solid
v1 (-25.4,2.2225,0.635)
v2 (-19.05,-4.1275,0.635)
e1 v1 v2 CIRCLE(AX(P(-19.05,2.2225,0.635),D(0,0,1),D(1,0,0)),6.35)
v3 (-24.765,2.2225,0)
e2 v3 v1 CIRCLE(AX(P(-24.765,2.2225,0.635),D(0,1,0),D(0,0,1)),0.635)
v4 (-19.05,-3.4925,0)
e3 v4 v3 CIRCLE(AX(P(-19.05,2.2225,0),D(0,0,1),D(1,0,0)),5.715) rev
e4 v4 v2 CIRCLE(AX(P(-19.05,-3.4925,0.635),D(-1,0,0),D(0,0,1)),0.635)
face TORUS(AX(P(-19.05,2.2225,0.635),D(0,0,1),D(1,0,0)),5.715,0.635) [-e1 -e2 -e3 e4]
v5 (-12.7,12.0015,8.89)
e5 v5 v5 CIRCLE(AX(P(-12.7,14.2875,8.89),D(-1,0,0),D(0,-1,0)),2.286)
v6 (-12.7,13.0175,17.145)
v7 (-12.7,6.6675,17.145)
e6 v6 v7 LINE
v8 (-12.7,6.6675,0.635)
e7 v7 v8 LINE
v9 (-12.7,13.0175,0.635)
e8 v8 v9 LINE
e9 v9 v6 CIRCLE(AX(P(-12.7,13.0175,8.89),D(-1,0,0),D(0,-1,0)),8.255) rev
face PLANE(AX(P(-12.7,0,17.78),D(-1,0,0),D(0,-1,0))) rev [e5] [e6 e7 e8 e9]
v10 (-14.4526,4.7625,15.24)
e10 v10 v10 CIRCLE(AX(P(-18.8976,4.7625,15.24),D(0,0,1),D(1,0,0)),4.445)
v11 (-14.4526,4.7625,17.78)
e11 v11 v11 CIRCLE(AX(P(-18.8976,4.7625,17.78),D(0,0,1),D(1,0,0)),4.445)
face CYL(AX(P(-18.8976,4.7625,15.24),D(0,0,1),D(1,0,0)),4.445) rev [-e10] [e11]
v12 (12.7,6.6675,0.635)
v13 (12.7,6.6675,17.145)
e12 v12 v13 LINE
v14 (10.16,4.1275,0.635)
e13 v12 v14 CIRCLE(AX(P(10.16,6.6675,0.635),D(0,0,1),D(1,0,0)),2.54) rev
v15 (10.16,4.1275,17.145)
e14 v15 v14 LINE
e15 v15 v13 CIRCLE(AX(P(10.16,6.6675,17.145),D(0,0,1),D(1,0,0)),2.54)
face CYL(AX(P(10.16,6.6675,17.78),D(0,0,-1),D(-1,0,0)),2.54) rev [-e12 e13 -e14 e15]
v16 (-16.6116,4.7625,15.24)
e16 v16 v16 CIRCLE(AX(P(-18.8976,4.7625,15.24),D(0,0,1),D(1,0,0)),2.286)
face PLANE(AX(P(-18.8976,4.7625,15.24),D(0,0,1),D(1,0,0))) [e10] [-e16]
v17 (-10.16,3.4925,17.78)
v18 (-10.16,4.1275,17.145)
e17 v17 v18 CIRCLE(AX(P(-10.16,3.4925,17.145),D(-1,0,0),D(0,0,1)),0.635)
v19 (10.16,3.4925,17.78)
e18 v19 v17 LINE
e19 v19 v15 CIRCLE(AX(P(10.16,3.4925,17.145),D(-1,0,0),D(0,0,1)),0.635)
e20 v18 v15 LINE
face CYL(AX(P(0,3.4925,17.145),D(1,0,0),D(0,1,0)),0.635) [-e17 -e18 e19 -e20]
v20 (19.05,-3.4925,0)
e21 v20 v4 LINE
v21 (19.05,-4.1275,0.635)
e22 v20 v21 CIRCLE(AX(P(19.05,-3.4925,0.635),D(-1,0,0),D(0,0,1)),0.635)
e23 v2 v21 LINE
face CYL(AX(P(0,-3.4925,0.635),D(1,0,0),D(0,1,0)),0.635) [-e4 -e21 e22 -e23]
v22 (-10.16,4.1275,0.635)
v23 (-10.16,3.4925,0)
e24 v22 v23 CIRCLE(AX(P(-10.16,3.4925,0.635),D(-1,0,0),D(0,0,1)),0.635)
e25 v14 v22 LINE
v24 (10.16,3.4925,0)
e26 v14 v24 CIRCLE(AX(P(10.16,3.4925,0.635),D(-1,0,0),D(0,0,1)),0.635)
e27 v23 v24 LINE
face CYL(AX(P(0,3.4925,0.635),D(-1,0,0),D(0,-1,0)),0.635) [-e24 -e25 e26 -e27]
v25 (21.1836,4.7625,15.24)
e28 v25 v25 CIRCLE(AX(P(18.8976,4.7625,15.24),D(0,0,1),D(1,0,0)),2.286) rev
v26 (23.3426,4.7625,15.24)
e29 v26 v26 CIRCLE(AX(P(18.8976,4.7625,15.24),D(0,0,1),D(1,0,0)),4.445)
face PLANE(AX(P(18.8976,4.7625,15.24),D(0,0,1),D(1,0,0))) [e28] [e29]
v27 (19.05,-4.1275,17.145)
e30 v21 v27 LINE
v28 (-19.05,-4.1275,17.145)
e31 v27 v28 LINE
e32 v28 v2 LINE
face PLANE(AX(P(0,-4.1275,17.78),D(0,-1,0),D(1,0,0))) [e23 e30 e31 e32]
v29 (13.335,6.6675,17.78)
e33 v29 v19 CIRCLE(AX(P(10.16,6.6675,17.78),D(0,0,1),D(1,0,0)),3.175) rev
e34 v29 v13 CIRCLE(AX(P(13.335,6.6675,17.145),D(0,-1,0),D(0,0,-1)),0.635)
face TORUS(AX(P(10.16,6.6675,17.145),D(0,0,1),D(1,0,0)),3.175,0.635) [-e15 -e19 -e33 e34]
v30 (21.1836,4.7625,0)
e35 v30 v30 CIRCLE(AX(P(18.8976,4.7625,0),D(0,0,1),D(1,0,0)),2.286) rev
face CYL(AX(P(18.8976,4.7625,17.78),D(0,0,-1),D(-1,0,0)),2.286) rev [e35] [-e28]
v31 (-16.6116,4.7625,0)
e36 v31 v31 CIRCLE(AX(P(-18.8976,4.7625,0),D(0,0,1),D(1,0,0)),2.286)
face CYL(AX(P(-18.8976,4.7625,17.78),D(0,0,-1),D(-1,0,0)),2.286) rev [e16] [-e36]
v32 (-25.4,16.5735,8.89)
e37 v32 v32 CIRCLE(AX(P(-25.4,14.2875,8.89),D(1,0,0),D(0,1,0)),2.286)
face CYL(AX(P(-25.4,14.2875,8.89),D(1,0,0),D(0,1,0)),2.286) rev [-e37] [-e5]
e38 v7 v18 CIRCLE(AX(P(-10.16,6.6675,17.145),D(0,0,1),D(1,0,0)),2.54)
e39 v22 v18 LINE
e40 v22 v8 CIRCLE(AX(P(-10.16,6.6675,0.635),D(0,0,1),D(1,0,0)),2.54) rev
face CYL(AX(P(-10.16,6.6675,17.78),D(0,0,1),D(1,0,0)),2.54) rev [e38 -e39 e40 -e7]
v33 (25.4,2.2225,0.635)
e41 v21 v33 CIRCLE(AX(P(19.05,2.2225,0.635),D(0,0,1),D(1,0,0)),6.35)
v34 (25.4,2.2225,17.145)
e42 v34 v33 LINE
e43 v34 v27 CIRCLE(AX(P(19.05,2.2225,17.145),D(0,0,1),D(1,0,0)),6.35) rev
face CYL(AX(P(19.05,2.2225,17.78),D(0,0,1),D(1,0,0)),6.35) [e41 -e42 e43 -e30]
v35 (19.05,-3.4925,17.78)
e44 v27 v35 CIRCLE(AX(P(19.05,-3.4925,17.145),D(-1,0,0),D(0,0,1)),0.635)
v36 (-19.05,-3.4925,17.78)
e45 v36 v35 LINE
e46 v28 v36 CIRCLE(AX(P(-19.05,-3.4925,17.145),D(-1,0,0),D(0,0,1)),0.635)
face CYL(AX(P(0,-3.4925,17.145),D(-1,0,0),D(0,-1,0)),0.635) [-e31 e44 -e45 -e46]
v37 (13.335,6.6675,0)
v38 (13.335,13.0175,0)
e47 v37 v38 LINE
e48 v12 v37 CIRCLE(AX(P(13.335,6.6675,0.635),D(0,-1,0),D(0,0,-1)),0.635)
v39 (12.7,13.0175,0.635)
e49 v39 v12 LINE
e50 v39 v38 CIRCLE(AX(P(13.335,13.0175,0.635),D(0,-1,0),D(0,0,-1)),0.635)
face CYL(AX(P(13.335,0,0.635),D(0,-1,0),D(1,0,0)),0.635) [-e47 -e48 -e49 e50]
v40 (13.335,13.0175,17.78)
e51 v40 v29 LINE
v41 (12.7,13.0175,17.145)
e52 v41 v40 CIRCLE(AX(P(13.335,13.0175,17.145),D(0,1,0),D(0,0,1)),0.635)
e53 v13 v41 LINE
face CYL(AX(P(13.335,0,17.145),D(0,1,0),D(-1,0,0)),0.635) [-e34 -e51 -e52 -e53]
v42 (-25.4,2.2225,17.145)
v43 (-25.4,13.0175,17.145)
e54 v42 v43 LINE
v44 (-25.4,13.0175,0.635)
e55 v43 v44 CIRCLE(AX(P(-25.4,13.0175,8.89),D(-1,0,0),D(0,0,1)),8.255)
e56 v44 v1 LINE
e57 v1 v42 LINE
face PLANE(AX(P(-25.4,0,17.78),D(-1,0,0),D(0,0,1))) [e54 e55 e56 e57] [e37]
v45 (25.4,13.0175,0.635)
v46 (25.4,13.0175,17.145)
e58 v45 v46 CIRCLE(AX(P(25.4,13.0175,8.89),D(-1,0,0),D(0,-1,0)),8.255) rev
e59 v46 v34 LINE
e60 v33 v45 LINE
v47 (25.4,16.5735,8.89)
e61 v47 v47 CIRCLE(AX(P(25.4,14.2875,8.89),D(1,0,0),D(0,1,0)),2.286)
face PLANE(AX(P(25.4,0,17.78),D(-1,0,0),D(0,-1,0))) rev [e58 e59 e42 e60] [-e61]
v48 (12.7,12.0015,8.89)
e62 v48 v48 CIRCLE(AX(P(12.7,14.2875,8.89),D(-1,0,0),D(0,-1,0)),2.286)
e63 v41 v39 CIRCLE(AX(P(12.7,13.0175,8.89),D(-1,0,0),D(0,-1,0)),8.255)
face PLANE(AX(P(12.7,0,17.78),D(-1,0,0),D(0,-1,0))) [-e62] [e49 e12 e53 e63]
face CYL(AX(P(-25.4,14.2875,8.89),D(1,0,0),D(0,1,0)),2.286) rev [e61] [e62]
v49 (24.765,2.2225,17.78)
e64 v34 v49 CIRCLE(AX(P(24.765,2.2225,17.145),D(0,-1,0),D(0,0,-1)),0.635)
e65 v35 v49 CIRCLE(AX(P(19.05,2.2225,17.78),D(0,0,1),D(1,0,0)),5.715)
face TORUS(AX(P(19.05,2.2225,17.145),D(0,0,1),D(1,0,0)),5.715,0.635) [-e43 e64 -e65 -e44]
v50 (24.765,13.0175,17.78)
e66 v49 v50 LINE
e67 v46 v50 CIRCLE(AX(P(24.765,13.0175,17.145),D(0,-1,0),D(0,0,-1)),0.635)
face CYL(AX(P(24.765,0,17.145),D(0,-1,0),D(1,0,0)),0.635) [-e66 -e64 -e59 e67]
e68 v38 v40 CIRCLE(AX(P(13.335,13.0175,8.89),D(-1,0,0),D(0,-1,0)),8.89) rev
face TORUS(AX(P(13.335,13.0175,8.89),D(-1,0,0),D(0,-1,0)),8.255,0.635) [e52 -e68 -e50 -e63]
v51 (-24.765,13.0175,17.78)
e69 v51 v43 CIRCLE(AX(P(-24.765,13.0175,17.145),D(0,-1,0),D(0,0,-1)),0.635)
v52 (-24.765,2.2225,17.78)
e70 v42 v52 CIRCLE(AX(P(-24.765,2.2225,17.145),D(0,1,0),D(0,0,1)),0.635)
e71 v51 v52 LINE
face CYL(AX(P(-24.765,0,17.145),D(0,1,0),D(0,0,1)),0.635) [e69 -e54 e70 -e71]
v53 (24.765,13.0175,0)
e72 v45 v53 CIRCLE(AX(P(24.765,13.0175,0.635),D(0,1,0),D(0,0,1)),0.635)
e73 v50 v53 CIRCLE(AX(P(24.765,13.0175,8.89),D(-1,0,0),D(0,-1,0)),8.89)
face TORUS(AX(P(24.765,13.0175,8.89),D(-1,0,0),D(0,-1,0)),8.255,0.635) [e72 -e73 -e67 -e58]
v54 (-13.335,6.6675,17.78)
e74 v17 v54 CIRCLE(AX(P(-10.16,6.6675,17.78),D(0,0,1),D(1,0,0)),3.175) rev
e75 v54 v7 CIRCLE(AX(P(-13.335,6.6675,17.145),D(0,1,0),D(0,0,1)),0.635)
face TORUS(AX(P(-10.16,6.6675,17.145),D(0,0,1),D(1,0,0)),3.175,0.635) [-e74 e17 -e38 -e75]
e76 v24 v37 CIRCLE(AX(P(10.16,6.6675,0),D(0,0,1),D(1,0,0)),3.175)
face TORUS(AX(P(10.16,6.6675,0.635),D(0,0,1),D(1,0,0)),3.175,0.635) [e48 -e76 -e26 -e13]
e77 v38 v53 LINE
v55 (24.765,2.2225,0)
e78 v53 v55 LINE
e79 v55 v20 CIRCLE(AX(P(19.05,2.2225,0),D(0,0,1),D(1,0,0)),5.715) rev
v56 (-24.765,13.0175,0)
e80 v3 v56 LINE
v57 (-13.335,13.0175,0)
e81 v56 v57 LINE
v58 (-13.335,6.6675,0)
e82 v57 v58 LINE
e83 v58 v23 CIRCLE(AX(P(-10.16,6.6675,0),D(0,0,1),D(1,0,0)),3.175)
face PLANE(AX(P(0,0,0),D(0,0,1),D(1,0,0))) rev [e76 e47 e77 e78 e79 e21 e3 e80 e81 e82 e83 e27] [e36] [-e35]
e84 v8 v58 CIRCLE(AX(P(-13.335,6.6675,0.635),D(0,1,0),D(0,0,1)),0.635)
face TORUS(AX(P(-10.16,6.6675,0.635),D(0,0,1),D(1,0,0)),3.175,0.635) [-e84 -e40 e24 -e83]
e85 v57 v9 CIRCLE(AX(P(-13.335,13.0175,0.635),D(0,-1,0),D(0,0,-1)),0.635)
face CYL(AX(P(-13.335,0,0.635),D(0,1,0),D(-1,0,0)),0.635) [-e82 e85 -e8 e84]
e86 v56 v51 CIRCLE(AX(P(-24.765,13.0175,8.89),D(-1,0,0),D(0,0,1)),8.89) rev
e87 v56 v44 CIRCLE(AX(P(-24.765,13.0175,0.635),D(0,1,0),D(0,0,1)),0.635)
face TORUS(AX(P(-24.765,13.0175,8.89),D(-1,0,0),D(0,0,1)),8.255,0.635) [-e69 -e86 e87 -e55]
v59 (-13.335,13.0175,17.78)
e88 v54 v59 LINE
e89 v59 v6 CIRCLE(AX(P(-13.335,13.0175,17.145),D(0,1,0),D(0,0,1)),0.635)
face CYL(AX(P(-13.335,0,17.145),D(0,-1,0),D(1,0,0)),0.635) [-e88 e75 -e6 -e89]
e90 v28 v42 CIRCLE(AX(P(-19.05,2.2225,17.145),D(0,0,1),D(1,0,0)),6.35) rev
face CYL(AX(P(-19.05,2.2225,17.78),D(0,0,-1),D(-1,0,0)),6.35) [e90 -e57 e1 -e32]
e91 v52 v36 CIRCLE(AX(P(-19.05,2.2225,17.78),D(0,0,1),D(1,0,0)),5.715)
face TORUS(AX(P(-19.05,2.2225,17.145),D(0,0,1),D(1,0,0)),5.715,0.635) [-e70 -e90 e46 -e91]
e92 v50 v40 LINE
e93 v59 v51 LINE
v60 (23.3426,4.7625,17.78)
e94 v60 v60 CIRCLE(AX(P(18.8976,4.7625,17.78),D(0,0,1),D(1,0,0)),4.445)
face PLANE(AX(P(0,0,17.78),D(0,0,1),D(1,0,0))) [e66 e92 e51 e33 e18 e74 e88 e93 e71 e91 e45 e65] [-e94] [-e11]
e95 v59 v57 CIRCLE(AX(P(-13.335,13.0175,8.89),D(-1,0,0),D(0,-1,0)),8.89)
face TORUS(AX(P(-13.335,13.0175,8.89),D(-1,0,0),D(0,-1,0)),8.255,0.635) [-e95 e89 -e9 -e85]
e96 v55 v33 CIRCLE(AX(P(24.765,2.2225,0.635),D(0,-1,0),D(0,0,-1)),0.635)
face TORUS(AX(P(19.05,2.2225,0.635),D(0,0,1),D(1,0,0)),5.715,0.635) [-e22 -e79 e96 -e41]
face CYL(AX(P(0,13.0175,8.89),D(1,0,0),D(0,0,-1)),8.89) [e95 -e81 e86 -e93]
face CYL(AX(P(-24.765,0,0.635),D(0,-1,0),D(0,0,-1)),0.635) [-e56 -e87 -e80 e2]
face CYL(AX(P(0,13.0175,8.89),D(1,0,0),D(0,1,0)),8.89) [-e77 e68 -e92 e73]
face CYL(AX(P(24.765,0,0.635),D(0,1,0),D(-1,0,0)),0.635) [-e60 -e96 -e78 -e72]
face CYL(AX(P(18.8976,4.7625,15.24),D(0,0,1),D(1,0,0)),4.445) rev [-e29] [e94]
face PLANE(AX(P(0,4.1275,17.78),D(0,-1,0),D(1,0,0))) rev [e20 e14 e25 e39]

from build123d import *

# Parameters (mm, degrees)
SKETCH1_R           = 2.286000000000002
BOSS_EXTRUDE1_DEPTH = 17.779999999999998
SKETCH2_R           = 2.286
CUT_EXTRUDE1_DEPTH  = 59.35180122541205
FILLET1_R           = 9.525
FILLET2_R           = 6.349999999999998
SKETCH3_R           = 4.444999999999999
SKETCH3_R_2         = 4.444999999999996
CUT_EXTRUDE2_DEPTH  = 2.54
FILLET3_R           = 2.54
FILLET4_R           = 8.89
FILLET5_R           = 0.635


with BuildPart() as part:
    # Sketch1 → Boss-Extrude1 (new body)
    # profile 1 of 3: a face of its own
    with BuildSketch(Plane.XY):
        Polygon((-12.699999999999998, -4.1275), (12.700000000000001, -4.127499999999988), (12.700000000000001, 4.127500000000004), (-12.700000000000001, 4.1275), align=None)
    # profile 2 of 3: a face of its own
    with BuildSketch(Plane.XY):
        Polygon((12.700000000000001, 4.127500000000004), (12.700000000000001, -4.127499999999988), (25.4, -4.127499999999997), (25.39999999999999, 22.542500000000004), (12.700000000000003, 22.5425), align=None)
        with Locations((18.8976, 4.762500000000002)):
            Circle(SKETCH1_R, mode=Mode.SUBTRACT)
    # profile 3 of 3: a face of its own
    with BuildSketch(Plane.XY):
        Polygon((-25.4, -4.127500000000003), (-12.699999999999998, -4.1275), (-12.700000000000001, 4.1275), (-12.700000000000006, 22.5425), (-25.4, 22.542499999999997), align=None)
        with Locations((-18.8976, 4.7624999999999975)):
            Circle(SKETCH1_R, mode=Mode.SUBTRACT)
    extrude(amount=BOSS_EXTRUDE1_DEPTH)

    # Sketch2 → Cut-Extrude1 (cut, through all)
    with BuildSketch(Plane(origin=(25.4, 6.61e-15, 0), x_dir=(0, 0, -1), z_dir=(1, 6.2e-16, 0))):
        with Locations(Location((-8.889999999999999, 14.287499999999996, 0), (0, 0, 90))):
            Circle(SKETCH2_R)
    extrude(amount=-CUT_EXTRUDE1_DEPTH, mode=Mode.SUBTRACT)

    # Fillet1
    # the kernel refuses this fillet: 9.525 mm, written as the material it takes off along each edge
    with BuildSketch(Plane(origin=(49.21249999999999, 22.54250000000001, 0), x_dir=(2.8e-16, -1, 0), z_dir=(-1, -2.8e-16, 0)), Plane(origin=(11.11249999999999, 22.542499999999997, 0), x_dir=(0, -1, 0), z_dir=(-1, 0, 0))) as fillet1_piece_1:
        with BuildLine():
            CenterArc((FILLET1_R, FILLET1_R), FILLET1_R, 180, 90)
            Line((0, FILLET1_R), (0, 0))
            Line((0, 0), (FILLET1_R, 0))
        make_face()
    extrude(amount=60.32499999999998, mode=Mode.SUBTRACT)
    with BuildSketch(Plane(origin=(11.11249999999999, 22.542499999999997, 17.779999999999998), x_dir=(0, -1, 0), z_dir=(-1, 0, 0)), Plane(origin=(49.21249999999999, 22.54250000000001, 17.779999999999998), x_dir=(2.8e-16, -1, 0), z_dir=(-1, -2.8e-16, 0))) as fillet1_piece_2:
        with BuildLine():
            CenterArc((FILLET1_R, -FILLET1_R), FILLET1_R, 90, 90)
            Line((0, -FILLET1_R), (0, 0))
            Line((0, 0), (FILLET1_R, 0))
        make_face()
    extrude(amount=60.32499999999998, mode=Mode.SUBTRACT)

    # Fillet2
    fillet2_edges = [part.edges().sort_by_distance(p)[0] for p in [
        (25.4, -4.127499999999997, 8.889999999999999),
        (-25.4, -4.127500000000003, 8.889999999999999),
    ]]
    fillet(fillet2_edges, radius=FILLET2_R)

    # Sketch3 → Cut-Extrude2 (cut)
    with BuildSketch(Plane.XY.offset(17.779999999999998)):
        with Locations((-18.8976, 4.7624999999999975)):
            Circle(SKETCH3_R)
        with Locations((18.8976, 4.762500000000002)):
            Circle(SKETCH3_R_2)
    extrude(amount=-CUT_EXTRUDE2_DEPTH, mode=Mode.SUBTRACT)

    # Fillet3
    fillet3_edges = [part.edges().sort_by_distance(p)[0] for p in [
        (-12.700000000000001, 4.1275, 8.889999999999999),
        (12.700000000000001, 4.127500000000004, 8.889999999999999),
    ]]
    fillet(fillet3_edges, radius=FILLET3_R)

    # Fillet4
    # the kernel refuses this fillet: 8.89 mm, written as the material it takes off along each edge
    with BuildSketch(Plane(origin=(-19.834004279952136, 22.521309762405814, 8.89), x_dir=(0, -0.7302954784048413, 0.6831314033342663), z_dir=(1, 0, 0))) as fillet4_piece_1:
        with BuildLine():
            CenterArc((6.940587579719998, 6.492349293547839), FILLET4_R, 133.08904141467275, 179.99957562758698)
            ThreePointArc((0.8675253607749441, 12.984653605948957), (-2.12943437574429, 6.6635780753126035), (0, 0))
            ThreePointArc((0, 0), (6.506800855987493, -2.5689114711987417), (13.013601711974989, -7.7e-16))
        make_face()
    extrude(amount=77.76800855990426, mode=Mode.SUBTRACT)
    with BuildSketch(Plane(origin=(-57.934004254500124, 22.521309762405814, 8.89), x_dir=(0, -0.7302954779049243, 0.683131403868698), z_dir=(1, 0, 0))) as fillet4_piece_2:
        with BuildLine():
            CenterArc((6.940587574290149, 6.492349297992085), FILLET4_R, 133.08904154045896, 179.9995754598716)
            ThreePointArc((0.8675253410919979, 12.984653597060502), (-2.1294343810853733, 6.663578066799472), (0, 0))
            ThreePointArc((0, 0), (6.506800850897012, -2.568911466437052), (13.013601701794025, -6.8e-16))
        make_face()
    extrude(amount=77.76800850900023, mode=Mode.SUBTRACT)

    # Fillet5
    # the kernel refuses this fillet: 0.635 mm, written as the material it takes off along each edge
    with BuildSketch(Plane(origin=(12.700000000000003, 13.017500000000002, 0), x_dir=(1, -7e-17, 0), z_dir=(-7e-17, -1, 0))) as fillet5_piece_1:
        with BuildLine():
            CenterArc((FILLET5_R, FILLET5_R), FILLET5_R, 180, 90)
            Line((0, FILLET5_R), (0, 0))
            Line((0, 0), (FILLET5_R, 0))
        make_face()
    extrude(amount=6.349999999999998, mode=Mode.SUBTRACT)
    with BuildSketch(Plane(origin=(12.700000000000001, 6.667500000000003, 17.779999999999998), x_dir=(1, -7e-17, 0), z_dir=(7e-17, 1, 0))) as fillet5_piece_2:
        with BuildLine():
            CenterArc((FILLET5_R, FILLET5_R), FILLET5_R, 180, 90)
            Line((0, FILLET5_R), (0, 0))
            Line((0, 0), (FILLET5_R, 0))
        make_face()
    extrude(amount=6.349999999999999, mode=Mode.SUBTRACT)
    with BuildSketch(Plane(origin=(-12.700000000000001, 6.6674999999999995, 0), x_dir=(-1, -3.3e-16, 0), z_dir=(-3.3e-16, 1, 0))) as fillet5_piece_3:
        with BuildLine():
            CenterArc((FILLET5_R, FILLET5_R), FILLET5_R, 180, 90)
            Line((0, FILLET5_R), (0, 0))
            Line((0, 0), (FILLET5_R, 0))
        make_face()
    extrude(amount=6.350000000000002, mode=Mode.SUBTRACT)
    with BuildSketch(Plane(origin=(-12.700000000000003, 13.0175, 17.779999999999998), x_dir=(-1, -3.3e-16, 0), z_dir=(3.3e-16, -1, 0))) as fillet5_piece_4:
        with BuildLine():
            CenterArc((FILLET5_R, FILLET5_R), FILLET5_R, 180, 90)
            Line((0, FILLET5_R), (0, 0))
            Line((0, 0), (FILLET5_R, 0))
        make_face()
    extrude(amount=6.35, mode=Mode.SUBTRACT)
    with BuildSketch(Plane(origin=(10.16, 6.667500000000004, 0), x_dir=(1, 3.5e-16, 0), z_dir=(-3.5e-16, 1, 0))) as fillet5_piece_5:
        with BuildLine():
            CenterArc((2.539999999999999 + FILLET5_R, -FILLET5_R), FILLET5_R, 90, 90)
            Line((2.539999999999999, -FILLET5_R), (2.539999999999999, 0))
            Line((2.539999999999999, 0), (2.539999999999999 + FILLET5_R, 0))
        make_face()
    revolve(axis=Axis((10.16, 6.667500000000004, 0), (0, 0, -1)), revolution_arc=90, mode=Mode.SUBTRACT)
    with BuildSketch(Plane(origin=(10.16, 6.667500000000004, 17.779999999999998), x_dir=(1, 3.5e-16, 0), z_dir=(-3.5e-16, 1, 0))) as fillet5_piece_6:
        with BuildLine():
            CenterArc((2.539999999999999 + FILLET5_R, FILLET5_R), FILLET5_R, 180, 90)
            Line((2.539999999999999, FILLET5_R), (2.539999999999999, 0))
            Line((2.539999999999999, 0), (2.539999999999999 + FILLET5_R, 0))
        make_face()
    revolve(axis=Axis((10.16, 6.667500000000004, 17.779999999999998), (0, 0, -1)), revolution_arc=90, mode=Mode.SUBTRACT)
    with BuildSketch(Plane(origin=(-10.160000000000002, 6.6675, 0), x_dir=(-1, 3.5e-16, 0), z_dir=(3.5e-16, 1, 0))) as fillet5_piece_7:
        with BuildLine():
            CenterArc((2.540000000000001 + FILLET5_R, FILLET5_R), FILLET5_R, 180, 90)
            Line((2.540000000000001, FILLET5_R), (2.540000000000001, 0))
            Line((2.540000000000001, 0), (2.540000000000001 + FILLET5_R, 0))
        make_face()
    revolve(axis=Axis((-10.160000000000002, 6.6675, 0), (0, 0, 1)), revolution_arc=90, mode=Mode.SUBTRACT)
    with BuildSketch(Plane(origin=(-10.160000000000002, 6.6675, 17.779999999999998), x_dir=(-1, 3.5e-16, 0), z_dir=(3.5e-16, 1, 0))) as fillet5_piece_8:
        with BuildLine():
            CenterArc((2.540000000000001 + FILLET5_R, -FILLET5_R), FILLET5_R, 90, 90)
            Line((2.540000000000001, -FILLET5_R), (2.540000000000001, 0))
            Line((2.540000000000001, 0), (2.540000000000001 + FILLET5_R, 0))
        make_face()
    revolve(axis=Axis((-10.160000000000002, 6.6675, 17.779999999999998), (0, 0, 1)), revolution_arc=90, mode=Mode.SUBTRACT)
    with BuildSketch(Plane(origin=(25.399999999999995, 13.017502351626003, 8.889999999992654), x_dir=(0, 3.7033476170192908e-06, 0.9999999999931426), z_dir=(0, -0.9999999999931426, 3.7033476170192908e-06))) as fillet5_piece_9:
        with BuildLine():
            CenterArc((8.889999999999999 - FILLET5_R, FILLET5_R), FILLET5_R, 270, 90)
            Line((8.889999999999999 - FILLET5_R, -3.55e-15), (8.889999999999999, 0))
            Line((8.889999999999999, 0), (8.889999999999999, FILLET5_R))
        make_face()
    revolve(axis=Axis((25.399999999999995, 13.017502351626003, 8.889999999992654), (-1, 0, 0)), revolution_arc=179.99957562758703, mode=Mode.SUBTRACT)
    with BuildSketch(Plane(origin=(12.7, 13.017502351626003, 8.889999999992654), x_dir=(0, 3.7033476170192908e-06, 0.9999999999931426), z_dir=(0, -0.9999999999931426, 3.7033476170192908e-06))) as fillet5_piece_10:
        with BuildLine():
            CenterArc((8.889999999999999 - FILLET5_R, -FILLET5_R), FILLET5_R, 0, 90)
            Line((8.889999999999999 - FILLET5_R, 1.78e-15), (8.889999999999999, 0))
            Line((8.889999999999999, 0), (8.889999999999999, -FILLET5_R))
        make_face()
    revolve(axis=Axis((12.7, 13.017502351626003, 8.889999999992654), (-1, 0, 0)), revolution_arc=179.99957562758703, mode=Mode.SUBTRACT)
    with BuildSketch(Plane(origin=(-12.700000000000006, 13.017502351626003, 8.889999999992654), x_dir=(0, 3.7033476170192908e-06, 0.9999999999931426), z_dir=(0, -0.9999999999931426, 3.7033476170192908e-06))) as fillet5_piece_11:
        with BuildLine():
            CenterArc((8.889999999999999 - FILLET5_R, FILLET5_R), FILLET5_R, 270, 90)
            Line((8.889999999999999 - FILLET5_R, 0), (8.889999999999999, 0))
            Line((8.889999999999999, 0), (8.889999999999999, FILLET5_R))
        make_face()
    revolve(axis=Axis((-12.700000000000006, 13.017502351626003, 8.889999999992654), (-1, 0, 0)), revolution_arc=179.99957562758703, mode=Mode.SUBTRACT)
    with BuildSketch(Plane(origin=(-25.4, 13.017502352555672, 8.889999999997206), x_dir=(0, 3.7048116909257714e-06, 0.9999999999931372), z_dir=(0, -0.9999999999931372, 3.7048116909257714e-06))) as fillet5_piece_12:
        with BuildLine():
            CenterArc((8.890000000000002 - FILLET5_R * 1.00000000146, -FILLET5_R), FILLET5_R, 0, 90)
            Line((8.890000000000002 - FILLET5_R * 1.00000000146, 0), (8.890000000000002, 0))
            Line((8.890000000000002, 0), (8.890000000000002 - FILLET5_R * 1.46404813032e-09, -FILLET5_R))
        make_face()
    revolve(axis=Axis((-25.4, 13.017502352555672, 8.889999999997206), (-1, 0, 0)), revolution_arc=179.99957545987195, mode=Mode.SUBTRACT)
    with BuildSketch(Plane(origin=(25.4, 2.222500000000016, 0), x_dir=(-1, -2.7e-16, 0), z_dir=(-2.7e-16, 1, 0))) as fillet5_piece_13:
        with BuildLine():
            CenterArc((FILLET5_R, FILLET5_R), FILLET5_R, 180, 90)
            Line((0, FILLET5_R), (0, 0))
            Line((0, 0), (FILLET5_R, 0))
        make_face()
    extrude(amount=10.794999999999986, mode=Mode.SUBTRACT)
    with BuildSketch(Plane(origin=(25.4, 2.222500000000016, 17.779999999999998), x_dir=(-1, -2.7e-16, 0), z_dir=(-2.7e-16, 1, 0))) as fillet5_piece_14:
        with BuildLine():
            CenterArc((FILLET5_R, -FILLET5_R), FILLET5_R, 90, 90)
            Line((0, -FILLET5_R), (0, 0))
            Line((0, 0), (FILLET5_R, 0))
        make_face()
    extrude(amount=10.794999999999982, mode=Mode.SUBTRACT)
    with BuildSketch(Plane(origin=(-19.049999999999997, -4.127500000000002, 0), x_dir=(-1.2e-16, 1, 0), z_dir=(1, 1.2e-16, 0))) as fillet5_piece_15:
        with BuildLine():
            CenterArc((FILLET5_R, FILLET5_R), FILLET5_R, 180, 90)
            Line((0, FILLET5_R), (0, 0))
            Line((0, 0), (FILLET5_R, 0))
        make_face()
    extrude(amount=38.1, mode=Mode.SUBTRACT)
    with BuildSketch(Plane(origin=(-25.4, 13.017500000000002, 0), x_dir=(1, 0, 0), z_dir=(0, -1, 0))) as fillet5_piece_16:
        with BuildLine():
            CenterArc((FILLET5_R, FILLET5_R), FILLET5_R, 180, 90)
            Line((0, FILLET5_R), (0, 0))
            Line((0, 0), (FILLET5_R, 0))
        make_face()
    extrude(amount=10.795000000000009, mode=Mode.SUBTRACT)
    with BuildSketch(Plane(origin=(-19.05, 2.222499999999994, 0), x_dir=(1.12e-15, -1, 0), z_dir=(1, 1.12e-15, 0))) as fillet5_piece_17:
        with BuildLine():
            CenterArc((6.349999999999998 - FILLET5_R, -FILLET5_R), FILLET5_R, 1.002e-14, 90)
            Line((6.349999999999999, -FILLET5_R), (6.349999999999998, 0))
            Line((6.349999999999998, 0), (6.349999999999998 - FILLET5_R, 0))
        make_face()
    revolve(axis=Axis((-19.05, 2.222499999999994, 0), (0, 0, -1)), revolution_arc=90.00000000000006, mode=Mode.SUBTRACT)
    with BuildSketch(Plane(origin=(19.049999999999997, 2.2225000000000144, 0), x_dir=(1.12e-15, -1, 0), z_dir=(-1, -1.12e-15, 0))) as fillet5_piece_18:
        with BuildLine():
            CenterArc((6.35 - FILLET5_R, FILLET5_R), FILLET5_R, 270, 89.99999999999999)
            Line((6.35, FILLET5_R), (6.35, 0))
            Line((6.35, 0), (6.35 - FILLET5_R, 0))
        make_face()
    revolve(axis=Axis((19.049999999999997, 2.2225000000000144, 0), (0, 0, 1)), revolution_arc=89.99999999999996, mode=Mode.SUBTRACT)
    with BuildSketch(Plane(origin=(19.05, -4.127499999999998, 17.779999999999998), x_dir=(-1.2e-16, 1, 0), z_dir=(-1, -1.2e-16, 0))) as fillet5_piece_19:
        with BuildLine():
            CenterArc((FILLET5_R, FILLET5_R), FILLET5_R, 180, 90)
            Line((0, FILLET5_R), (0, 0))
            Line((0, 0), (FILLET5_R, 0))
        make_face()
    extrude(amount=38.099999999999994, mode=Mode.SUBTRACT)
    with BuildSketch(Plane(origin=(-25.4, 13.0175, 17.779999999999998), x_dir=(1, 0, 0), z_dir=(0, -1, 0))) as fillet5_piece_20:
        with BuildLine():
            CenterArc((FILLET5_R, -FILLET5_R), FILLET5_R, 90, 90)
            Line((0, -FILLET5_R), (0, 0))
            Line((0, 0), (FILLET5_R, 0))
        make_face()
    extrude(amount=10.795000000000007, mode=Mode.SUBTRACT)
    with BuildSketch(Plane(origin=(-19.05, 2.222499999999994, 17.779999999999998), x_dir=(1.12e-15, -1, 0), z_dir=(1, 1.12e-15, 0))) as fillet5_piece_21:
        with BuildLine():
            CenterArc((6.349999999999998 - FILLET5_R, FILLET5_R), FILLET5_R, 270, 90)
            Line((6.349999999999999, FILLET5_R), (6.349999999999998, 0))
            Line((6.349999999999998, 0), (6.349999999999998 - FILLET5_R, 0))
        make_face()
    revolve(axis=Axis((-19.05, 2.222499999999994, 17.779999999999998), (0, 0, -1)), revolution_arc=90.00000000000006, mode=Mode.SUBTRACT)
    with BuildSketch(Plane(origin=(19.049999999999997, 2.2225000000000144, 17.779999999999998), x_dir=(5.6e-16, -1, 0), z_dir=(-1, -5.6e-16, 0))) as fillet5_piece_22:
        with BuildLine():
            CenterArc((6.349999999999998 - FILLET5_R, -FILLET5_R), FILLET5_R, 0, 90)
            Line((6.349999999999998, -FILLET5_R), (6.349999999999998, 0))
            Line((6.349999999999998, 0), (6.349999999999998 - FILLET5_R, 0))
        make_face()
    revolve(axis=Axis((19.049999999999997, 2.2225000000000144, 17.779999999999998), (0, 0, 1)), revolution_arc=89.99999999999999, mode=Mode.SUBTRACT)
    with BuildSketch(Plane(origin=(10.16, 4.127500000000004, 0), x_dir=(1.4e-16, -1, 0), z_dir=(-1, -1.4e-16, 0))) as fillet5_piece_23:
        with BuildLine():
            CenterArc((FILLET5_R, FILLET5_R), FILLET5_R, 180, 90)
            Line((0, FILLET5_R), (0, 0))
            Line((0, 0), (FILLET5_R, 0))
        make_face()
    extrude(amount=20.32, mode=Mode.SUBTRACT)
    with BuildSketch(Plane(origin=(10.16, 4.127500000000004, 17.779999999999998), x_dir=(1.4e-16, -1, 0), z_dir=(-1, -1.4e-16, 0))) as fillet5_piece_24:
        with BuildLine():
            CenterArc((FILLET5_R, -FILLET5_R), FILLET5_R, 90, 90)
            Line((0, -FILLET5_R), (0, 0))
            Line((0, 0), (FILLET5_R, 0))
        make_face()
    extrude(amount=20.32, mode=Mode.SUBTRACT)
    with BuildSketch(Plane(origin=(-25.400000000000002, 13.0175, 8.255), x_dir=(0, 3.7048116949886797e-06, 0.9999999999931372), z_dir=(0, 0.9999999999931372, -3.7048116949886797e-06))) as fillet5_piece_25:
        with BuildLine():
            CenterArc((9.524999999999999 - FILLET5_R, FILLET5_R), FILLET5_R, 270, 90)
            Line((9.524999999999999, FILLET5_R), (9.524999999999999, 0))
            Line((9.524999999999999, 0), (9.524999999999999 - FILLET5_R, 3.55e-15))
        make_face()
    revolve(axis=Axis((-25.400000000000002, 13.0175, 8.255), (1, 0, 0)), revolution_arc=0.00021227007400047, mode=Mode.SUBTRACT)
    with BuildSketch(Plane(origin=(-25.400000000000002, 13.0175, 9.525), x_dir=(0, 1.9e-16, -1), z_dir=(0, -1, -1.9e-16))) as fillet5_piece_26:
        with BuildLine():
            CenterArc((9.525 - FILLET5_R, FILLET5_R), FILLET5_R, 270, 90)
            Line((9.525 - FILLET5_R, 3.55e-15), (9.525, 0))
            Line((9.525, 0), (9.525, FILLET5_R))
        make_face()
    revolve(axis=Axis((-25.400000000000002, 13.0175, 9.525), (1, 0, 0)), revolution_arc=0.00021227005730892, mode=Mode.SUBTRACT)
    with BuildSketch(Plane(origin=(25.4, 13.0175, 8.255), x_dir=(0, 3.703347646485368e-06, 0.9999999999931426), z_dir=(0, 0.9999999999931426, -3.703347646485368e-06))) as fillet5_piece_27:
        with BuildLine():
            CenterArc((9.525000000000004 - FILLET5_R, -FILLET5_R), FILLET5_R, 3.2056e-13, 89.99999999999966)
            Line((9.525000000000004, -FILLET5_R), (9.525000000000004, 0))
            Line((9.525000000000004, 0), (9.525000000000004 - FILLET5_R, -3.55e-15))
        make_face()
    revolve(axis=Axis((25.4, 13.0175, 8.255), (1, 0, 0)), revolution_arc=0.00021218619020397, mode=Mode.SUBTRACT)
    with BuildSketch(Plane(origin=(25.4, 13.0175, 9.525), x_dir=(0, 1.9e-16, -1), z_dir=(0, -1, -1.9e-16))) as fillet5_piece_28:
        with BuildLine():
            CenterArc((9.525000000000002 - FILLET5_R, -FILLET5_R), FILLET5_R, 0, 90)
            Line((9.525000000000002 - FILLET5_R, 0), (9.525000000000002, 0))
            Line((9.525000000000002, 0), (9.525000000000002, -FILLET5_R))
        make_face()
    revolve(axis=Axis((25.4, 13.0175, 9.525), (1, 0, 0)), revolution_arc=0.00021218622311635, mode=Mode.SUBTRACT)
    with BuildSketch(Plane(origin=(-12.700000000000006, 13.0175, 8.255), x_dir=(0, 3.703347646485368e-06, 0.9999999999931426), z_dir=(0, 0.9999999999931426, -3.703347646485368e-06))) as fillet5_piece_29:
        with BuildLine():
            CenterArc((9.525000000000004 - FILLET5_R, -FILLET5_R), FILLET5_R, 0, 90)
            Line((9.525000000000004 - FILLET5_R, 1.78e-15), (9.525000000000004, 0))
            Line((9.525000000000004, 0), (9.525000000000004, -FILLET5_R))
        make_face()
    revolve(axis=Axis((-12.700000000000006, 13.0175, 8.255), (1, 0, 0)), revolution_arc=0.00021218619020397, mode=Mode.SUBTRACT)
    with BuildSketch(Plane(origin=(-12.700000000000006, 13.0175, 9.525), x_dir=(0, 1.9e-16, -1), z_dir=(0, -1, -1.9e-16))) as fillet5_piece_30:
        with BuildLine():
            CenterArc((9.525000000000002 - FILLET5_R, -FILLET5_R), FILLET5_R, 0, 90)
            Line((9.525000000000002 - FILLET5_R, 1.78e-15), (9.525000000000002, 0))
            Line((9.525000000000002, 0), (9.525000000000002, -FILLET5_R))
        make_face()
    revolve(axis=Axis((-12.700000000000006, 13.0175, 9.525), (1, 0, 0)), revolution_arc=0.00021218622311635, mode=Mode.SUBTRACT)
    with BuildSketch(Plane(origin=(12.700000000000003, 13.0175, 8.255), x_dir=(0, 3.703347646485368e-06, 0.9999999999931426), z_dir=(0, 0.9999999999931426, -3.703347646485368e-06))) as fillet5_piece_31:
        with BuildLine():
            CenterArc((9.525000000000004 - FILLET5_R, FILLET5_R), FILLET5_R, 270, 90)
            Line((9.525000000000004 - FILLET5_R, -1.78e-15), (9.525000000000004, 0))
            Line((9.525000000000004, 0), (9.525000000000004, FILLET5_R))
        make_face()
    revolve(axis=Axis((12.700000000000003, 13.0175, 8.255), (1, 0, 0)), revolution_arc=0.00021218619020397, mode=Mode.SUBTRACT)
    with BuildSketch(Plane(origin=(12.700000000000003, 13.0175, 9.525), x_dir=(0, 1.9e-16, -1), z_dir=(0, -1, -1.9e-16))) as fillet5_piece_32:
        with BuildLine():
            CenterArc((9.525000000000002 - FILLET5_R, FILLET5_R), FILLET5_R, 270, 90)
            Line((9.525000000000002 - FILLET5_R, -1.78e-15), (9.525000000000002, 0))
            Line((9.525000000000002, 0), (9.525000000000002, FILLET5_R))
        make_face()
    revolve(axis=Axis((12.700000000000003, 13.0175, 9.525), (1, 0, 0)), revolution_arc=0.00021218622311635, mode=Mode.SUBTRACT)


solid = part.part
